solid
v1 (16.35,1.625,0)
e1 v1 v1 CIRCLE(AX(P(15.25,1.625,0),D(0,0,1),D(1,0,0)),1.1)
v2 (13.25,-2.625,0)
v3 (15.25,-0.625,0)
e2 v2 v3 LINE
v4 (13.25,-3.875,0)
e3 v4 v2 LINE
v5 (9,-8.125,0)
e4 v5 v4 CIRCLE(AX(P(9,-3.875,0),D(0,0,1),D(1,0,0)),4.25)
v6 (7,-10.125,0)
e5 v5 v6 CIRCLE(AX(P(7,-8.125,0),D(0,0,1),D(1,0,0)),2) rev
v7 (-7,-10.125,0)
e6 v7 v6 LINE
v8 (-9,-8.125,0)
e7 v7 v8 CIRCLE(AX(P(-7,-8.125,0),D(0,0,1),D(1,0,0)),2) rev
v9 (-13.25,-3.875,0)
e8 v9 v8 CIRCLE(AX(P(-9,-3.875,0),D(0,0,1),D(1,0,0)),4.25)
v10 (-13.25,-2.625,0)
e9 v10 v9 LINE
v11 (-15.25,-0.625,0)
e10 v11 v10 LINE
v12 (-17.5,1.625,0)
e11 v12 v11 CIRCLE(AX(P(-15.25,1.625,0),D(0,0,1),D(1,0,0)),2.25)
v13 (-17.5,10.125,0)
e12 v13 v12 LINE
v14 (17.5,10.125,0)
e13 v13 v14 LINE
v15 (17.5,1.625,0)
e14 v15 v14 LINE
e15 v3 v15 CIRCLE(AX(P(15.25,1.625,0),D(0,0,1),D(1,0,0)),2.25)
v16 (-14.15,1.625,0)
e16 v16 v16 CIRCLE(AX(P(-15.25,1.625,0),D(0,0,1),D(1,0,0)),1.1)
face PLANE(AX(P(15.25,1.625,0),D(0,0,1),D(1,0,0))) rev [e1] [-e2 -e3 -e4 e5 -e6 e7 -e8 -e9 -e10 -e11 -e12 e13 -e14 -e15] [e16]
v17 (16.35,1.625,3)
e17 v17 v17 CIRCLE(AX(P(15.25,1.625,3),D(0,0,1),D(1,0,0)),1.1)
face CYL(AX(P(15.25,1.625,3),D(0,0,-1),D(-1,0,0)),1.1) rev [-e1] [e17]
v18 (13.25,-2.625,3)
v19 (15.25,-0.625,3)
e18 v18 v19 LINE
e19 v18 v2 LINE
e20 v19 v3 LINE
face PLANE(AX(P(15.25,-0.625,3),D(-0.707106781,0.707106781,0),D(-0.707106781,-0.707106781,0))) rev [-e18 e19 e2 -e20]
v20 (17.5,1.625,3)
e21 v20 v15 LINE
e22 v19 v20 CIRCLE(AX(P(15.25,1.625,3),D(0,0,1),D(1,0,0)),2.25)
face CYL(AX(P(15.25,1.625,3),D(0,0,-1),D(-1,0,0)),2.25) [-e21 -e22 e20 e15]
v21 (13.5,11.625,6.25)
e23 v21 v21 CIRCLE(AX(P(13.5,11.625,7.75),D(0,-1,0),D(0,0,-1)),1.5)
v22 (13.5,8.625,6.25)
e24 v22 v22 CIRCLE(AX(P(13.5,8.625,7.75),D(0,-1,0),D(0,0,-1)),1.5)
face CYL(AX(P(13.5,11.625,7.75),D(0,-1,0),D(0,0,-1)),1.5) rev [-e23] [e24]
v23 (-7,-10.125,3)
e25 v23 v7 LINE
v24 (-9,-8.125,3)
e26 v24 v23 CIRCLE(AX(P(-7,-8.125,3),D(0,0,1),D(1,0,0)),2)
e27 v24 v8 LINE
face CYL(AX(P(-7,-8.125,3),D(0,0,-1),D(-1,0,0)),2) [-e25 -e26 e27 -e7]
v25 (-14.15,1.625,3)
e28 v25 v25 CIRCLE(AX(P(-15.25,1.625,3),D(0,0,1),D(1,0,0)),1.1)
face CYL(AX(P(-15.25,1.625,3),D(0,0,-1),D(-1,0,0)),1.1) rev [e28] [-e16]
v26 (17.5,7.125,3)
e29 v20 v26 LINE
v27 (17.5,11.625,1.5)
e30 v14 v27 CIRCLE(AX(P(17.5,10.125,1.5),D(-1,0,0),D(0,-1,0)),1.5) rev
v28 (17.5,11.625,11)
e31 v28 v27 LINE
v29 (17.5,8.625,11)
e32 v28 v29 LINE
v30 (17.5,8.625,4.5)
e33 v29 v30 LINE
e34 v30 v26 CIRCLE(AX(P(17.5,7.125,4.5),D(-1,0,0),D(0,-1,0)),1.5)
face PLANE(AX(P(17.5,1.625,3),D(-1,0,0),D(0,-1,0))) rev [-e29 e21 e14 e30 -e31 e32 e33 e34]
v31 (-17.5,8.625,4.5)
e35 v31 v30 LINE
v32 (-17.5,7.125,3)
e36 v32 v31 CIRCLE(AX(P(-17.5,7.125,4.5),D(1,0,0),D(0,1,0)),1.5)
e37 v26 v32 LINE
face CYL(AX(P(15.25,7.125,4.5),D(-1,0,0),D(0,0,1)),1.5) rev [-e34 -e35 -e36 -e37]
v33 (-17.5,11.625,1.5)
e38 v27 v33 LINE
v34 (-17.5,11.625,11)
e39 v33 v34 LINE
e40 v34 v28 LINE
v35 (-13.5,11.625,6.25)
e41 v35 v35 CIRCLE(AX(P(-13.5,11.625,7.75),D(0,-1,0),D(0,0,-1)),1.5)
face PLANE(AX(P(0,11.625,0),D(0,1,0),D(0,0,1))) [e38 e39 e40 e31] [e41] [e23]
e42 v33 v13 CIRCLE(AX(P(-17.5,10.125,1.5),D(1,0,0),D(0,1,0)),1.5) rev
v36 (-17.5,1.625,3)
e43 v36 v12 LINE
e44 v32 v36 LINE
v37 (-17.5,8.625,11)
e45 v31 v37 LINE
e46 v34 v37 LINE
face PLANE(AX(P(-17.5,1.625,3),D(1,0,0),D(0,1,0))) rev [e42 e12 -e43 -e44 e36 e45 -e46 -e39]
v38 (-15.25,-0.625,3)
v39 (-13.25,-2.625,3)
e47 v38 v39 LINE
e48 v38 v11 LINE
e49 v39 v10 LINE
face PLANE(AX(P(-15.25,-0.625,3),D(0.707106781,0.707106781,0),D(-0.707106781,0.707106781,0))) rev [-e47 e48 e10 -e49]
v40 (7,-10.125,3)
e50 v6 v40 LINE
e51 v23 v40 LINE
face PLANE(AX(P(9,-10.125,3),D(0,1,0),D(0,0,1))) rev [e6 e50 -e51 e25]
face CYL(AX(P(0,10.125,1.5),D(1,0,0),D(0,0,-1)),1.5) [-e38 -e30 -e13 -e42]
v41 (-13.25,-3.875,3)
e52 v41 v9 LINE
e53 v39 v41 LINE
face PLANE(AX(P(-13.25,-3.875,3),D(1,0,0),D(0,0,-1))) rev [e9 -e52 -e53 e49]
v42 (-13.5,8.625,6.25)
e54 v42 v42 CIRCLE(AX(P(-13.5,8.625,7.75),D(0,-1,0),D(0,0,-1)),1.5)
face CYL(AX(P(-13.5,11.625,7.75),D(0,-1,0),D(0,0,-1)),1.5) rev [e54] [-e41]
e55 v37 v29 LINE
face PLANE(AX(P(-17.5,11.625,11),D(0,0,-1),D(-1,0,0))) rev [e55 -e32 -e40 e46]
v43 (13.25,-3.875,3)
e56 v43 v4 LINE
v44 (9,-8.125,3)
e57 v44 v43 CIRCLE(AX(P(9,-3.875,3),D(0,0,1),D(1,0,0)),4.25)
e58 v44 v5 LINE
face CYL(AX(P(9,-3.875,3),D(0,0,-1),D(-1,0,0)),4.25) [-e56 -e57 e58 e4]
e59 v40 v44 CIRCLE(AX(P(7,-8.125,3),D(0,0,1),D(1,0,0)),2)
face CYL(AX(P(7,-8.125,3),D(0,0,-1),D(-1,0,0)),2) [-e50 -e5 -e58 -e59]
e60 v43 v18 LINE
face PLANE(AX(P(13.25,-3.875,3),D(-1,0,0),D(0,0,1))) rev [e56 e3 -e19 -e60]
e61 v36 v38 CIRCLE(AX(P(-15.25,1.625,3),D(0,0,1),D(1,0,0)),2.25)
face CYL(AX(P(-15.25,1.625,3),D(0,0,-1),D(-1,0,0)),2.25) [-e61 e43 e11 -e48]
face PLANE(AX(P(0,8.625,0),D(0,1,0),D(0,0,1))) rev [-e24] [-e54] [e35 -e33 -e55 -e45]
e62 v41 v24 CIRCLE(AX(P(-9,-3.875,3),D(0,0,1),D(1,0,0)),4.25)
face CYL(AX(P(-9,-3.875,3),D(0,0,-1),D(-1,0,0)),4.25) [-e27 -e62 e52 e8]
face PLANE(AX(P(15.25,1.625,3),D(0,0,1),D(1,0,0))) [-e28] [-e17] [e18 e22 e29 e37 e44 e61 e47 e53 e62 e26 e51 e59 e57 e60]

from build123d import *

# Parameters (mm, degrees)
SKETCH_1_R          = 1.1
EXTRUDE_1_DEPTH     = 3
SKETCH_2_W          = 35
SKETCH_2_H          = 11
EXTRUDE_2_DEPTH     = 3
FILLET_1_R          = 1.5
SKETCH_3_R          = 1.5
CUT_EXTRUDE_1_DEPTH = 3
FILLET_2_R          = 2


with BuildPart() as part:
    # 草图1 → 凸台-拉伸1 (new body)
    with BuildSketch(Plane.XY):
        with BuildLine():
            Line((-13.25, -3.875), (-13.25, -2.625))
            Line((-13.25, -2.625), (-15.25, -0.625))
            ThreePointArc((-15.25, -0.625), (-16.840990258, 0.034009742), (-17.5, 1.625))
            Line((-17.5, 1.625), (-17.5, 8.625))
            Line((-17.5, 8.625), (-13.25, 8.625))
            Line((-13.25, 8.625), (13.25, 8.625))
            Line((13.25, 8.625), (17.5, 8.625))
            Line((17.5, 8.625), (17.5, 1.625))
            ThreePointArc((17.5, 1.625), (16.840990258, 0.034009742), (15.25, -0.625))
            Line((15.25, -0.625), (13.25, -2.625))
            Line((13.25, -2.625), (13.25, -3.875))
            ThreePointArc((13.25, -3.875), (12.00520382, -6.88020382), (9, -8.125))
            Line((9, -8.125), (9, -10.125))
            Line((9, -10.125), (-9, -10.125))
            Line((-9, -10.125), (-9, -8.125))
            ThreePointArc((-9, -8.125), (-12.00520382, -6.88020382), (-13.25, -3.875))
        make_face()
        with Locations((-15.25, 1.625)):
            Circle(SKETCH_1_R, mode=Mode.SUBTRACT)
        with Locations((15.25, 1.625)):
            Circle(SKETCH_1_R, mode=Mode.SUBTRACT)
    extrude(amount=EXTRUDE_1_DEPTH)

    # 草图2 → 凸台-拉伸2 (add)
    with BuildSketch(Plane(origin=(0, 8.625, 0), x_dir=(1, 0, 0), z_dir=(0, 1, 0))):
        with Locations((0, -5.5)):
            Rectangle(SKETCH_2_W, SKETCH_2_H)
    extrude(amount=EXTRUDE_2_DEPTH)

    # 圆角1
    fillet_1_edges = [part.edges().sort_by_distance(p)[0] for p in [
        (0, 8.625, 3),
        (0, 11.625, 0),
    ]]
    fillet(fillet_1_edges, radius=FILLET_1_R)

    # 草图3 → 切除-拉伸1 (cut)
    with BuildSketch(Plane.XZ.offset(-8.625)):
        with Locations(Location((13.5, 7.75, 0), (0, 0, 270))):
            Circle(SKETCH_3_R)
        with Locations(Location((-13.5, 7.75, 0), (0, 0, 270))):
            Circle(SKETCH_3_R)
    extrude(amount=-CUT_EXTRUDE_1_DEPTH, mode=Mode.SUBTRACT)

    # 圆角2
    fillet_2_edges = [part.edges().sort_by_distance(p)[0] for p in [
        (9, -10.125, 1.5),
        (-9, -10.125, 1.5),
    ]]
    fillet(fillet_2_edges, radius=FILLET_2_R - 0.0001)  # a hair under: the kernel refuses the full size


solid = part.part
